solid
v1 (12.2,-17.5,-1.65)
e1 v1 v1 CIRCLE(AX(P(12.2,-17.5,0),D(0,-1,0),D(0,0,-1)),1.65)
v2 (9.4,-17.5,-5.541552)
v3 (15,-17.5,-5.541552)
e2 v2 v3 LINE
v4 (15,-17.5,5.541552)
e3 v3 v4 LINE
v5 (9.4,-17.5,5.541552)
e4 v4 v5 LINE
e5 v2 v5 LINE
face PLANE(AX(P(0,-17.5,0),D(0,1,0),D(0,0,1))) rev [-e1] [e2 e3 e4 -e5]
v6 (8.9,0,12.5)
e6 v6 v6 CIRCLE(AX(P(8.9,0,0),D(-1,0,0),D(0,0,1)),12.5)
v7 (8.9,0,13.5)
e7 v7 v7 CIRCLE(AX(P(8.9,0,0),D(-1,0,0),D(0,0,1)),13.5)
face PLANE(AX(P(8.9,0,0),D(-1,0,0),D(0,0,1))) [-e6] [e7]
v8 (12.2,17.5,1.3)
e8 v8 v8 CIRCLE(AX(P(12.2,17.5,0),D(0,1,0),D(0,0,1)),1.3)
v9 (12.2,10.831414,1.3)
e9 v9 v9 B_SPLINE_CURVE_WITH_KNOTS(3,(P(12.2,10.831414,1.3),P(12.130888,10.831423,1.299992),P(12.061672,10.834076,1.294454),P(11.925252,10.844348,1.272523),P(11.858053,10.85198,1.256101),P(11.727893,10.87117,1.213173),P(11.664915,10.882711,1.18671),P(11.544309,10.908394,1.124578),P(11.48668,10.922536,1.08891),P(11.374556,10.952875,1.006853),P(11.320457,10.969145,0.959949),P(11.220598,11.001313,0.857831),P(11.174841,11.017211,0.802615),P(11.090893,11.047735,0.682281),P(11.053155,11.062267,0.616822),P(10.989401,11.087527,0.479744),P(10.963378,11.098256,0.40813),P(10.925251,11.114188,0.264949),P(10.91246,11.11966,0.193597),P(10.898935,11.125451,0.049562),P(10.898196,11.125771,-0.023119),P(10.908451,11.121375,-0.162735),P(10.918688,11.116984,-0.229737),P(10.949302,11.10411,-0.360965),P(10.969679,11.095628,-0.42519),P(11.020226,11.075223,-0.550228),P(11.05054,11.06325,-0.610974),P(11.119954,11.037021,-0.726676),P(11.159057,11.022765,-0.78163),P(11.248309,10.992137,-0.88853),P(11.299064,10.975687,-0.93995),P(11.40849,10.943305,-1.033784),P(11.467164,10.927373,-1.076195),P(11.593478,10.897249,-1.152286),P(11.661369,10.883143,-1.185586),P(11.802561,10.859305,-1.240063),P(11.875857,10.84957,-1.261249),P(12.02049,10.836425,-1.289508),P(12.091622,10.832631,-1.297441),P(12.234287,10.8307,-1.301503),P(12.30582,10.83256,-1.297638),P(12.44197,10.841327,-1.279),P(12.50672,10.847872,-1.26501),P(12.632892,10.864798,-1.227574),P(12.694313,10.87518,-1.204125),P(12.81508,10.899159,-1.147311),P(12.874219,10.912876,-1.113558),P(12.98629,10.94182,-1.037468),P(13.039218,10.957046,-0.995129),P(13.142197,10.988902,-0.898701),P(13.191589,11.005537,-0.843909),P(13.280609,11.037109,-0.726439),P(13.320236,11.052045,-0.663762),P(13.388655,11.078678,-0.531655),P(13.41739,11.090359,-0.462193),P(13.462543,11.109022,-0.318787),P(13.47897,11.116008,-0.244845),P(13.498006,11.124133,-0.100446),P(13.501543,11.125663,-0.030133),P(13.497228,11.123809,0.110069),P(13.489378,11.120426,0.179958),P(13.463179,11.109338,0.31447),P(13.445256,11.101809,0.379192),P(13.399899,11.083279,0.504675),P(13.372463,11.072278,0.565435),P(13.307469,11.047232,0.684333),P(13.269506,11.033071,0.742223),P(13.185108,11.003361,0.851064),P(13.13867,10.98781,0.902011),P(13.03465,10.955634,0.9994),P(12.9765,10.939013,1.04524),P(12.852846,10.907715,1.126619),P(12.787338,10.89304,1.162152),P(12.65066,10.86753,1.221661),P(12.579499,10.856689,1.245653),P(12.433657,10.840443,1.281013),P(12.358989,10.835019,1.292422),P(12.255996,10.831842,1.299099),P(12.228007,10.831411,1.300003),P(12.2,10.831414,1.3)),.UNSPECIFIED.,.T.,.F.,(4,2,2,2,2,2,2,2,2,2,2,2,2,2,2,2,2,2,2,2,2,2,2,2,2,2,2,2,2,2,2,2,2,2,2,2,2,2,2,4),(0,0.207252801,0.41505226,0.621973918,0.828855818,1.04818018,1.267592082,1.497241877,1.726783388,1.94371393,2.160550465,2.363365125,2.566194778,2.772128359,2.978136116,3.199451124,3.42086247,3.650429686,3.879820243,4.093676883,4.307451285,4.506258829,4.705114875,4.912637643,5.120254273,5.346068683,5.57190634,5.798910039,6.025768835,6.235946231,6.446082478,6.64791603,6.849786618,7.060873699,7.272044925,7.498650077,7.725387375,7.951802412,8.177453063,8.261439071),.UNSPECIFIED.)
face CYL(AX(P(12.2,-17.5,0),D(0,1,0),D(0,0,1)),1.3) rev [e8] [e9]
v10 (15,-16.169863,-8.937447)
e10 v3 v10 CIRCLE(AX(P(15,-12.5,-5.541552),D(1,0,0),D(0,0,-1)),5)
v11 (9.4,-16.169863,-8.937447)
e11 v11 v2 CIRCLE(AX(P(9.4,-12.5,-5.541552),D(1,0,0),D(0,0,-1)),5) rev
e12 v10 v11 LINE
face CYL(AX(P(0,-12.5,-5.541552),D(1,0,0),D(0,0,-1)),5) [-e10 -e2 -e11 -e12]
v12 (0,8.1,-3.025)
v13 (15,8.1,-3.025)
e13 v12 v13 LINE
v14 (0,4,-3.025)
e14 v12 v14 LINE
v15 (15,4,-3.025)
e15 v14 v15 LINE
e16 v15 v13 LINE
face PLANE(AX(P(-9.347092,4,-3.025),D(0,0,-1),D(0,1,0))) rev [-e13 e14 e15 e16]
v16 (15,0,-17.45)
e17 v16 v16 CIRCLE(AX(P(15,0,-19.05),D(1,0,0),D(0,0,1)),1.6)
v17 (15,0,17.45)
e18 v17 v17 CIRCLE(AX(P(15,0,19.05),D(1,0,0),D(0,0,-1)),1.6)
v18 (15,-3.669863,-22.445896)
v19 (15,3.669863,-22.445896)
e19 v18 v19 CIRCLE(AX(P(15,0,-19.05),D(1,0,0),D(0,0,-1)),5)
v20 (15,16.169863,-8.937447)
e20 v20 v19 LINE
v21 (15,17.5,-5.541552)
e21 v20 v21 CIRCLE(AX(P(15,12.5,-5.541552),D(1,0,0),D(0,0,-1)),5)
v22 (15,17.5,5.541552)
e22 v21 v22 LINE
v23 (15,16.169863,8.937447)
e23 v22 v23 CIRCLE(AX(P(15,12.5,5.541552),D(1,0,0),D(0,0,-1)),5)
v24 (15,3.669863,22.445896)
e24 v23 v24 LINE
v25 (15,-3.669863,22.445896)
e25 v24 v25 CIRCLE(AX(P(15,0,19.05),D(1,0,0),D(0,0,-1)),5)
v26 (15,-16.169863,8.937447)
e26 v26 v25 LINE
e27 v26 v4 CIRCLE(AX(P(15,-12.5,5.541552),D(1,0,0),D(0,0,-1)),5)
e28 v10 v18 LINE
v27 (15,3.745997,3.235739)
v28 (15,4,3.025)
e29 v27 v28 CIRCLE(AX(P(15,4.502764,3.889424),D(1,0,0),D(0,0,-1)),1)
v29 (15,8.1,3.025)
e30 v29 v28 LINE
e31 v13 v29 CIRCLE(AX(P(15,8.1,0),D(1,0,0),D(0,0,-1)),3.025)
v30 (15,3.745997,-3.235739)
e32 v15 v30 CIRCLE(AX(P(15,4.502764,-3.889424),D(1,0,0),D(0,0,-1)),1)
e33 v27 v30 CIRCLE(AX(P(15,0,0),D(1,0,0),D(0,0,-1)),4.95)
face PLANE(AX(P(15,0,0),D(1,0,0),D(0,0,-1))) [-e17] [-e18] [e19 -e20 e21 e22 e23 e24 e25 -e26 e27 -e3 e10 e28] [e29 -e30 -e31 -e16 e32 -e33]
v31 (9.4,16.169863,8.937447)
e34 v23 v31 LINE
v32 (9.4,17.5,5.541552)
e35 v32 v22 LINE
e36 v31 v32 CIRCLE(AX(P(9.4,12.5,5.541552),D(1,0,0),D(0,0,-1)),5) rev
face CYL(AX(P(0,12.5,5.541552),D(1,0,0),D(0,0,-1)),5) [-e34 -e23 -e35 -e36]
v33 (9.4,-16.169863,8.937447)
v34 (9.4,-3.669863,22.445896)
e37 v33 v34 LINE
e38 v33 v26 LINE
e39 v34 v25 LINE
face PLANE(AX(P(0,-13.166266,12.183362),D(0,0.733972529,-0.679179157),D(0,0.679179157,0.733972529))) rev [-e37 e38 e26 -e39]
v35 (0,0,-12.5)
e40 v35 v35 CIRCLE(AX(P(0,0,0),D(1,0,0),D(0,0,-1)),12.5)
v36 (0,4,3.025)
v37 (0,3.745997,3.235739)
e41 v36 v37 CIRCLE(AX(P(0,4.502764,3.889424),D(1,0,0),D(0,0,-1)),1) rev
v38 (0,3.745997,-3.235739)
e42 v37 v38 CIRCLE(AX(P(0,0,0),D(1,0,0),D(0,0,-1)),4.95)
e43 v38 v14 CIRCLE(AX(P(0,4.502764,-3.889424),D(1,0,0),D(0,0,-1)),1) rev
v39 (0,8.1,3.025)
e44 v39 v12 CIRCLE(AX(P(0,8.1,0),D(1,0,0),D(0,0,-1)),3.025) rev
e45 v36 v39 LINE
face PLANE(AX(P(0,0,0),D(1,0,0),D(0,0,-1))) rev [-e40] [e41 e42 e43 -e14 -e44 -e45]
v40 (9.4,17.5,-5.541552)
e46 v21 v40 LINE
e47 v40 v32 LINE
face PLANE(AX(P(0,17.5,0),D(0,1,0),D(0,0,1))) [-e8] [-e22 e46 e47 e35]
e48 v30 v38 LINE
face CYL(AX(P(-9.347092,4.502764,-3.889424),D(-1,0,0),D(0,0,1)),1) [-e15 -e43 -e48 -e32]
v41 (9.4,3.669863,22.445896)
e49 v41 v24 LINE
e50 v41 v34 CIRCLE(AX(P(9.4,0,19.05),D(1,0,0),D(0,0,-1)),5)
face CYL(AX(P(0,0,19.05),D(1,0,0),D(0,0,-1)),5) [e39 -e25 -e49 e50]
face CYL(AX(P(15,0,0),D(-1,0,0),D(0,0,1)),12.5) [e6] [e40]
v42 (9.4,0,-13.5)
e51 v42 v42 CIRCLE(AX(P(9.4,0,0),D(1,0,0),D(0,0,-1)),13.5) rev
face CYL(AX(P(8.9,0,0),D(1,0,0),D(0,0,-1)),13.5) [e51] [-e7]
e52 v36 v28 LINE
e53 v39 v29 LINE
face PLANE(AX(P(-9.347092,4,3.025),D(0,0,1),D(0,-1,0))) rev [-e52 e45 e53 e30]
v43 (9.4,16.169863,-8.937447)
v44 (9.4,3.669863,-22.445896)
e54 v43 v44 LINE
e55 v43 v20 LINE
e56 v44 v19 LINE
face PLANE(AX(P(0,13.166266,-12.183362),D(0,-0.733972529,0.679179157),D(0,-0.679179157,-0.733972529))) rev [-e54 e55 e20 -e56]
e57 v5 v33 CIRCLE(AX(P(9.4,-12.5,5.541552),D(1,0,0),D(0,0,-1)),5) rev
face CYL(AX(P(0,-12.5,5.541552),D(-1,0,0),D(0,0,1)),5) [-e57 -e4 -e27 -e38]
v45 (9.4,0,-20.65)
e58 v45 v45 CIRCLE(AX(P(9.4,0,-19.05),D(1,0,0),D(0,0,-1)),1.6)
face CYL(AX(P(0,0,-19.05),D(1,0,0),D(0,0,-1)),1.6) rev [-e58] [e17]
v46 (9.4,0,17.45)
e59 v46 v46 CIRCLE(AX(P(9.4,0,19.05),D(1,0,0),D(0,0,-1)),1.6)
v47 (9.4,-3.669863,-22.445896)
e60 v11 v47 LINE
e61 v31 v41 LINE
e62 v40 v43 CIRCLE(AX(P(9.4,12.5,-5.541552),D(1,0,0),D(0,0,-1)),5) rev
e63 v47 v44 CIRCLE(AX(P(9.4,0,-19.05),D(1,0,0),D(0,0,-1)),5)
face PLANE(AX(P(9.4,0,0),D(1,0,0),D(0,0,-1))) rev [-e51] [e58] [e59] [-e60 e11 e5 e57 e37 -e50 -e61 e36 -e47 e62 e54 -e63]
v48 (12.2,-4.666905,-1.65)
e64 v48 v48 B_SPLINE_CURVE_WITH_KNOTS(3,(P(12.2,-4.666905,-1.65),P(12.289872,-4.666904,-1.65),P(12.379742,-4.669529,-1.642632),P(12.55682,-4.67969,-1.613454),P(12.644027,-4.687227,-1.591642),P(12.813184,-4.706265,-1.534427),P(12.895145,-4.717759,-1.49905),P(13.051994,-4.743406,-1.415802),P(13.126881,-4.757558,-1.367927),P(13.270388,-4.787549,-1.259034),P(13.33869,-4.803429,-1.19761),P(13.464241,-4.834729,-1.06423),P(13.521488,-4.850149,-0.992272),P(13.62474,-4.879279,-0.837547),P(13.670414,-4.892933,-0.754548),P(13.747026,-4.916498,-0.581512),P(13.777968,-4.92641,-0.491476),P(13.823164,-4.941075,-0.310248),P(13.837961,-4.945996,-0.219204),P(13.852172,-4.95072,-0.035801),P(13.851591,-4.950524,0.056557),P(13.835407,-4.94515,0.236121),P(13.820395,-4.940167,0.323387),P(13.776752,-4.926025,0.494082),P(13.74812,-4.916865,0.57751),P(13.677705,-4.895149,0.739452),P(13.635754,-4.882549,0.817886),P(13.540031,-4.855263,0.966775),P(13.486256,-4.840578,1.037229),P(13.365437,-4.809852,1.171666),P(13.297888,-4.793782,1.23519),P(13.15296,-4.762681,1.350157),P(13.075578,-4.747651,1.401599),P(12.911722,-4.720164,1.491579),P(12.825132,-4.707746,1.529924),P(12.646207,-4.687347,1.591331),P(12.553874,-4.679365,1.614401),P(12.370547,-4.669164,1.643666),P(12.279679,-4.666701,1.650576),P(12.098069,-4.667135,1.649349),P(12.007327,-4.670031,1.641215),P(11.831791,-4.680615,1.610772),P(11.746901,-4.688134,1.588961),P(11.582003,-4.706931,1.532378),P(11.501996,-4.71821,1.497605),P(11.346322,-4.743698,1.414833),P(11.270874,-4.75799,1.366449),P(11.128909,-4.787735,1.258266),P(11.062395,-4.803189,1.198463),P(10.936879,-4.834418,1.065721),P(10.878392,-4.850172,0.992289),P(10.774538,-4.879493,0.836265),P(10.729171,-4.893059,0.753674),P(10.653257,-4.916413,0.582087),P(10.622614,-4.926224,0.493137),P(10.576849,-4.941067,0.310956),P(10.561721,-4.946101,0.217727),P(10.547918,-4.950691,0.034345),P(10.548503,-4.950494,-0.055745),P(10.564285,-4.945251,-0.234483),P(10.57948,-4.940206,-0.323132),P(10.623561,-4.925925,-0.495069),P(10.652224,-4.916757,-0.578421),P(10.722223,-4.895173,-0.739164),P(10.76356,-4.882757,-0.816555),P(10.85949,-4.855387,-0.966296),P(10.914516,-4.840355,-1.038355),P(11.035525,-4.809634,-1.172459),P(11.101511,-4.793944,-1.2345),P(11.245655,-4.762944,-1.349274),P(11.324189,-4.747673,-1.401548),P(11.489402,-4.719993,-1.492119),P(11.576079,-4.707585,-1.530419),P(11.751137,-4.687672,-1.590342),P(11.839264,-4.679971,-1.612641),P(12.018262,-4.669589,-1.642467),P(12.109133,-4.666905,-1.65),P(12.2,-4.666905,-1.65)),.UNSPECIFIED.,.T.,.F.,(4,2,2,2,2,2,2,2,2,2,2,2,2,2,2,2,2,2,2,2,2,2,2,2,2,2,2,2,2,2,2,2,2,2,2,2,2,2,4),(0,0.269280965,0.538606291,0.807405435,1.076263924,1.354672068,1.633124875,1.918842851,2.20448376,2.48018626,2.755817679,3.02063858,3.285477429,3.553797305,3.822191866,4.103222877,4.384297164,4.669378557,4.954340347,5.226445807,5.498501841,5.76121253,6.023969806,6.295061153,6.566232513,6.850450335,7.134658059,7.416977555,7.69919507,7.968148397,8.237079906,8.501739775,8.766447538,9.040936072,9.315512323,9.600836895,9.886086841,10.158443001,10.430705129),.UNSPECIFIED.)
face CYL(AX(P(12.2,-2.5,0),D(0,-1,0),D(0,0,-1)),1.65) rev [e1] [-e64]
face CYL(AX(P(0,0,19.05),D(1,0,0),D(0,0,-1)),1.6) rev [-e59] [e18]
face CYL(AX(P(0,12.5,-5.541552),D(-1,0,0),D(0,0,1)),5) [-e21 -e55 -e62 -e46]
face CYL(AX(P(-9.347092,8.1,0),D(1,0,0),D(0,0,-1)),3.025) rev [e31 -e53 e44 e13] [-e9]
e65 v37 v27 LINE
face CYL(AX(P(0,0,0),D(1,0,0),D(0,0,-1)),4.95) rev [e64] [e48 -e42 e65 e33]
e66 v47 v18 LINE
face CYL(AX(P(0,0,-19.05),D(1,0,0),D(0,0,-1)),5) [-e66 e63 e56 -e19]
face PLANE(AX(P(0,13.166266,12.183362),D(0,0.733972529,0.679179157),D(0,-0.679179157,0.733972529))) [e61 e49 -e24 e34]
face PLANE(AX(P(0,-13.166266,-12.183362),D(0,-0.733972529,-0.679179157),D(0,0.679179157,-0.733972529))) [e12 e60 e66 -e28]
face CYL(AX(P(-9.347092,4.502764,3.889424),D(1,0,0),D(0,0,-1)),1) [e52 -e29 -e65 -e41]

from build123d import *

# Parameters (mm, degrees)
SKETCH_1_R          = 12.5
EXTRUDE_1_DEPTH     = 15
SKETCH_2_R          = 25
EXTRUDE_2_DEPTH     = 5.6
SKETCH_3_R          = 4.95
CUT_EXTRUDE_1_DEPTH = 39.405728739
CUT_EXTRUDE_2_DEPTH = 39.405728739
SKETCH_5_R          = 1.3
CUT_EXTRUDE_3_DEPTH = 46.552167896
SKETCH_6_R          = 1.6
CUT_EXTRUDE_4_DEPTH = 35.003676367
EXTRUDE_START       = 0.5
SKETCH_7_R          = 13.5
SKETCH_7_R_2        = 12.5
EXTRUDE_3_DEPTH     = 0.5
CUT_EXTRUDE_6_DEPTH = 35.003676367
CUT_EXTRUDE_7_DEPTH = 15
FILLET_3_R          = 5
FILLET_4_R          = 1
CUT_EXTRUDE_START   = -15
SKETCH_11_R         = 1.65
SKETCH_11_R_2       = 1.3
CUT_EXTRUDE_8_DEPTH = 15


with BuildPart() as part:
    # ｽｹｯﾁ1 → ﾎﾞｽ - 押し出し1 (new body)
    with BuildSketch(Plane(origin=(0, 0, 0), x_dir=(0, 0, -1), z_dir=(1, 0, 0))):
        Circle(SKETCH_1_R)
    extrude(amount=EXTRUDE_1_DEPTH)

    # ｽｹｯﾁ2 → ﾎﾞｽ - 押し出し2 (add)
    with BuildSketch(Plane(origin=(15, 0, 0), x_dir=(0, 0, -1), z_dir=(1, 0, 0))):
        Circle(SKETCH_2_R)
    extrude(amount=-EXTRUDE_2_DEPTH)

    # ｽｹｯﾁ3 → ｶｯﾄ - 押し出し1 (cut, through all)
    with BuildSketch(Plane(origin=(15, 0, 0), x_dir=(0, 0, -1), z_dir=(1, 0, 0))):
        Circle(SKETCH_3_R)
    extrude(amount=-CUT_EXTRUDE_1_DEPTH, mode=Mode.SUBTRACT)

    # ｽｹｯﾁ4 → ｶｯﾄ - 押し出し2 (cut, through all)
    with BuildSketch(Plane(origin=(15, 0, 0), x_dir=(0, 0, -1), z_dir=(1, 0, 0))):
        with BuildLine():
            Line((-17.853571071, 17.5), (17.853571071, 17.5))
            ThreePointArc((17.853571071, 17.5), (0, 25), (-17.853571071, 17.5))
        make_face()
        with BuildLine():
            Line((17.853571071, -17.5), (-17.853571071, -17.5))
            ThreePointArc((-17.853571071, -17.5), (0, -25), (17.853571071, -17.5))
        make_face()
    extrude(amount=-CUT_EXTRUDE_2_DEPTH, mode=Mode.SUBTRACT)

    # ｽｹｯﾁ5 → ｶｯﾄ - 押し出し3 (cut, through all)
    with BuildSketch(Plane(origin=(0, 17.5, 0), x_dir=(1, 0, 0), z_dir=(0, 1, 0))):
        with Locations(Location((12.2, 0, 0), (0, 0, 270))):
            Circle(SKETCH_5_R)
    extrude(amount=-CUT_EXTRUDE_3_DEPTH, mode=Mode.SUBTRACT)

    # ｽｹｯﾁ6 → ｶｯﾄ - 押し出し4 (cut, through all)
    with BuildSketch(Plane(origin=(15, 0, 0), x_dir=(0, 0, -1), z_dir=(1, 0, 0))):
        with Locations((-19.05, 0)):
            Circle(SKETCH_6_R)
        with Locations((19.05, 0)):
            Circle(SKETCH_6_R)
    extrude(amount=-CUT_EXTRUDE_4_DEPTH, mode=Mode.SUBTRACT)

    # ｽｹｯﾁ7 → ﾎﾞｽ - 押し出し3 (add)
    with BuildSketch(Plane.ZY.offset(-9.4).offset(EXTRUDE_START)):
        with Locations(Location((0, 0, 0), (0, 0, 180))):
            Circle(SKETCH_7_R)
        Circle(SKETCH_7_R_2, mode=Mode.SUBTRACT)
    extrude(amount=-EXTRUDE_3_DEPTH)

    # ｽｹｯﾁ9 → ｶｯﾄ - 押し出し6 (cut, through all)
    with BuildSketch(Plane(origin=(15, 0, 0), x_dir=(0, 0, -1), z_dir=(1, 0, 0))):
        with BuildLine():
            Line((-17.853571071, -17.5), (-7.5, -17.5))
            Line((-7.5, -17.5), (-22.445895783, -3.669862645))
            ThreePointArc((-22.445895783, -3.669862645), (-24.05, 0), (-22.445895783, 3.669862645))
            Line((-22.445895783, 3.669862645), (-7.5, 17.5))
            Line((-7.5, 17.5), (-17.853571071, 17.5))
            ThreePointArc((-17.853571071, 17.5), (-25, 0), (-17.853571071, -17.5))
        make_face()
        with BuildLine():
            Line((22.445895783, -3.669862645), (7.5, -17.5))
            Line((7.5, -17.5), (17.853571071, -17.5))
            ThreePointArc((17.853571071, -17.5), (25, 0), (17.853571071, 17.5))
            Line((17.853571071, 17.5), (7.5, 17.5))
            Line((7.5, 17.5), (22.445895783, 3.669862645))
            ThreePointArc((22.445895783, 3.669862645), (23.631456041, 2.002563493), (24.05, 0))
            ThreePointArc((24.05, 0), (23.631456041, -2.002563493), (22.445895783, -3.669862645))
        make_face()
    extrude(amount=-CUT_EXTRUDE_6_DEPTH, mode=Mode.SUBTRACT)

    # ｽｹｯﾁ10 → ｶｯﾄ - 押し出し7 (cut)
    with BuildSketch(Plane(origin=(15, 0, 0), x_dir=(0, 0, -1), z_dir=(1, 0, 0))):
        with BuildLine():
            Line((-3.025, 4), (3.025, 4))
            Line((3.025, 4), (3.025, 8.1))
            ThreePointArc((3.025, 8.1), (0, 11.125), (-3.025, 8.1))
            Line((-3.025, 8.1), (-3.025, 4))
        make_face()
    extrude(amount=-CUT_EXTRUDE_7_DEPTH, mode=Mode.SUBTRACT)

    # ﾌｨﾚｯﾄ3
    fillet_3_edges = [part.edges().sort_by_distance(p)[0] for p in [
        (12.2, 17.5, -7.5),
        (12.2, 17.5, 7.5),
        (12.2, -17.5, -7.5),
        (12.2, -17.5, 7.5),
    ]]
    fillet(fillet_3_edges, radius=FILLET_3_R)

    # ﾌｨﾚｯﾄ4
    # the kernel refuses this fillet: 1 mm, written as the material it takes off along each edge
    with BuildSketch(Plane(origin=(-1.021064618, 4, -2.915904662), x_dir=(0, 0, -1), z_dir=(1, 0, 0))) as fillet_4_piece_1:
        with BuildLine():
            CenterArc((0.973519116, 0.502763893), FILLET_4_R, 210.183026769, 18.996983583)
            ThreePointArc((0.319834447, -0.254003148), (0.162538073, -0.123701466), (0, 0))
            Line((0, 0), (0.109095338, 0))
        make_face()
    extrude(amount=17.042129236, mode=Mode.SUBTRACT)
    with BuildSketch(Plane(origin=(-1.021064618, 4, 2.915904662), x_dir=(0, -0.6219076232643732, 0.783090612972508), z_dir=(1, 0, 0))) as fillet_4_piece_2:
        with BuildLine():
            CenterArc((0.449680983, -0.999148644), FILLET_4_R, 92.364416205, 18.996983583)
            Line((0.085431535, -0.067847222), (0, 0))
            ThreePointArc((0, 0), (0.204212924, -0.00421421), (0.408425847, 0))
        make_face()
    extrude(amount=17.042129236, mode=Mode.SUBTRACT)

    # ｽｹｯﾁ11 → ｶｯﾄ - 押し出し8 (cut)
    with BuildSketch(Plane.XZ.offset(17.5).offset(CUT_EXTRUDE_START)):
        with Locations(Location((12.2, 0, 0), (0, 0, 270))):
            Circle(SKETCH_11_R)
        with Locations(Location((12.2, 0, 0), (0, 0, 90))):
            Circle(SKETCH_11_R_2, mode=Mode.SUBTRACT)
    extrude(amount=CUT_EXTRUDE_8_DEPTH, mode=Mode.SUBTRACT)


solid = part.part
